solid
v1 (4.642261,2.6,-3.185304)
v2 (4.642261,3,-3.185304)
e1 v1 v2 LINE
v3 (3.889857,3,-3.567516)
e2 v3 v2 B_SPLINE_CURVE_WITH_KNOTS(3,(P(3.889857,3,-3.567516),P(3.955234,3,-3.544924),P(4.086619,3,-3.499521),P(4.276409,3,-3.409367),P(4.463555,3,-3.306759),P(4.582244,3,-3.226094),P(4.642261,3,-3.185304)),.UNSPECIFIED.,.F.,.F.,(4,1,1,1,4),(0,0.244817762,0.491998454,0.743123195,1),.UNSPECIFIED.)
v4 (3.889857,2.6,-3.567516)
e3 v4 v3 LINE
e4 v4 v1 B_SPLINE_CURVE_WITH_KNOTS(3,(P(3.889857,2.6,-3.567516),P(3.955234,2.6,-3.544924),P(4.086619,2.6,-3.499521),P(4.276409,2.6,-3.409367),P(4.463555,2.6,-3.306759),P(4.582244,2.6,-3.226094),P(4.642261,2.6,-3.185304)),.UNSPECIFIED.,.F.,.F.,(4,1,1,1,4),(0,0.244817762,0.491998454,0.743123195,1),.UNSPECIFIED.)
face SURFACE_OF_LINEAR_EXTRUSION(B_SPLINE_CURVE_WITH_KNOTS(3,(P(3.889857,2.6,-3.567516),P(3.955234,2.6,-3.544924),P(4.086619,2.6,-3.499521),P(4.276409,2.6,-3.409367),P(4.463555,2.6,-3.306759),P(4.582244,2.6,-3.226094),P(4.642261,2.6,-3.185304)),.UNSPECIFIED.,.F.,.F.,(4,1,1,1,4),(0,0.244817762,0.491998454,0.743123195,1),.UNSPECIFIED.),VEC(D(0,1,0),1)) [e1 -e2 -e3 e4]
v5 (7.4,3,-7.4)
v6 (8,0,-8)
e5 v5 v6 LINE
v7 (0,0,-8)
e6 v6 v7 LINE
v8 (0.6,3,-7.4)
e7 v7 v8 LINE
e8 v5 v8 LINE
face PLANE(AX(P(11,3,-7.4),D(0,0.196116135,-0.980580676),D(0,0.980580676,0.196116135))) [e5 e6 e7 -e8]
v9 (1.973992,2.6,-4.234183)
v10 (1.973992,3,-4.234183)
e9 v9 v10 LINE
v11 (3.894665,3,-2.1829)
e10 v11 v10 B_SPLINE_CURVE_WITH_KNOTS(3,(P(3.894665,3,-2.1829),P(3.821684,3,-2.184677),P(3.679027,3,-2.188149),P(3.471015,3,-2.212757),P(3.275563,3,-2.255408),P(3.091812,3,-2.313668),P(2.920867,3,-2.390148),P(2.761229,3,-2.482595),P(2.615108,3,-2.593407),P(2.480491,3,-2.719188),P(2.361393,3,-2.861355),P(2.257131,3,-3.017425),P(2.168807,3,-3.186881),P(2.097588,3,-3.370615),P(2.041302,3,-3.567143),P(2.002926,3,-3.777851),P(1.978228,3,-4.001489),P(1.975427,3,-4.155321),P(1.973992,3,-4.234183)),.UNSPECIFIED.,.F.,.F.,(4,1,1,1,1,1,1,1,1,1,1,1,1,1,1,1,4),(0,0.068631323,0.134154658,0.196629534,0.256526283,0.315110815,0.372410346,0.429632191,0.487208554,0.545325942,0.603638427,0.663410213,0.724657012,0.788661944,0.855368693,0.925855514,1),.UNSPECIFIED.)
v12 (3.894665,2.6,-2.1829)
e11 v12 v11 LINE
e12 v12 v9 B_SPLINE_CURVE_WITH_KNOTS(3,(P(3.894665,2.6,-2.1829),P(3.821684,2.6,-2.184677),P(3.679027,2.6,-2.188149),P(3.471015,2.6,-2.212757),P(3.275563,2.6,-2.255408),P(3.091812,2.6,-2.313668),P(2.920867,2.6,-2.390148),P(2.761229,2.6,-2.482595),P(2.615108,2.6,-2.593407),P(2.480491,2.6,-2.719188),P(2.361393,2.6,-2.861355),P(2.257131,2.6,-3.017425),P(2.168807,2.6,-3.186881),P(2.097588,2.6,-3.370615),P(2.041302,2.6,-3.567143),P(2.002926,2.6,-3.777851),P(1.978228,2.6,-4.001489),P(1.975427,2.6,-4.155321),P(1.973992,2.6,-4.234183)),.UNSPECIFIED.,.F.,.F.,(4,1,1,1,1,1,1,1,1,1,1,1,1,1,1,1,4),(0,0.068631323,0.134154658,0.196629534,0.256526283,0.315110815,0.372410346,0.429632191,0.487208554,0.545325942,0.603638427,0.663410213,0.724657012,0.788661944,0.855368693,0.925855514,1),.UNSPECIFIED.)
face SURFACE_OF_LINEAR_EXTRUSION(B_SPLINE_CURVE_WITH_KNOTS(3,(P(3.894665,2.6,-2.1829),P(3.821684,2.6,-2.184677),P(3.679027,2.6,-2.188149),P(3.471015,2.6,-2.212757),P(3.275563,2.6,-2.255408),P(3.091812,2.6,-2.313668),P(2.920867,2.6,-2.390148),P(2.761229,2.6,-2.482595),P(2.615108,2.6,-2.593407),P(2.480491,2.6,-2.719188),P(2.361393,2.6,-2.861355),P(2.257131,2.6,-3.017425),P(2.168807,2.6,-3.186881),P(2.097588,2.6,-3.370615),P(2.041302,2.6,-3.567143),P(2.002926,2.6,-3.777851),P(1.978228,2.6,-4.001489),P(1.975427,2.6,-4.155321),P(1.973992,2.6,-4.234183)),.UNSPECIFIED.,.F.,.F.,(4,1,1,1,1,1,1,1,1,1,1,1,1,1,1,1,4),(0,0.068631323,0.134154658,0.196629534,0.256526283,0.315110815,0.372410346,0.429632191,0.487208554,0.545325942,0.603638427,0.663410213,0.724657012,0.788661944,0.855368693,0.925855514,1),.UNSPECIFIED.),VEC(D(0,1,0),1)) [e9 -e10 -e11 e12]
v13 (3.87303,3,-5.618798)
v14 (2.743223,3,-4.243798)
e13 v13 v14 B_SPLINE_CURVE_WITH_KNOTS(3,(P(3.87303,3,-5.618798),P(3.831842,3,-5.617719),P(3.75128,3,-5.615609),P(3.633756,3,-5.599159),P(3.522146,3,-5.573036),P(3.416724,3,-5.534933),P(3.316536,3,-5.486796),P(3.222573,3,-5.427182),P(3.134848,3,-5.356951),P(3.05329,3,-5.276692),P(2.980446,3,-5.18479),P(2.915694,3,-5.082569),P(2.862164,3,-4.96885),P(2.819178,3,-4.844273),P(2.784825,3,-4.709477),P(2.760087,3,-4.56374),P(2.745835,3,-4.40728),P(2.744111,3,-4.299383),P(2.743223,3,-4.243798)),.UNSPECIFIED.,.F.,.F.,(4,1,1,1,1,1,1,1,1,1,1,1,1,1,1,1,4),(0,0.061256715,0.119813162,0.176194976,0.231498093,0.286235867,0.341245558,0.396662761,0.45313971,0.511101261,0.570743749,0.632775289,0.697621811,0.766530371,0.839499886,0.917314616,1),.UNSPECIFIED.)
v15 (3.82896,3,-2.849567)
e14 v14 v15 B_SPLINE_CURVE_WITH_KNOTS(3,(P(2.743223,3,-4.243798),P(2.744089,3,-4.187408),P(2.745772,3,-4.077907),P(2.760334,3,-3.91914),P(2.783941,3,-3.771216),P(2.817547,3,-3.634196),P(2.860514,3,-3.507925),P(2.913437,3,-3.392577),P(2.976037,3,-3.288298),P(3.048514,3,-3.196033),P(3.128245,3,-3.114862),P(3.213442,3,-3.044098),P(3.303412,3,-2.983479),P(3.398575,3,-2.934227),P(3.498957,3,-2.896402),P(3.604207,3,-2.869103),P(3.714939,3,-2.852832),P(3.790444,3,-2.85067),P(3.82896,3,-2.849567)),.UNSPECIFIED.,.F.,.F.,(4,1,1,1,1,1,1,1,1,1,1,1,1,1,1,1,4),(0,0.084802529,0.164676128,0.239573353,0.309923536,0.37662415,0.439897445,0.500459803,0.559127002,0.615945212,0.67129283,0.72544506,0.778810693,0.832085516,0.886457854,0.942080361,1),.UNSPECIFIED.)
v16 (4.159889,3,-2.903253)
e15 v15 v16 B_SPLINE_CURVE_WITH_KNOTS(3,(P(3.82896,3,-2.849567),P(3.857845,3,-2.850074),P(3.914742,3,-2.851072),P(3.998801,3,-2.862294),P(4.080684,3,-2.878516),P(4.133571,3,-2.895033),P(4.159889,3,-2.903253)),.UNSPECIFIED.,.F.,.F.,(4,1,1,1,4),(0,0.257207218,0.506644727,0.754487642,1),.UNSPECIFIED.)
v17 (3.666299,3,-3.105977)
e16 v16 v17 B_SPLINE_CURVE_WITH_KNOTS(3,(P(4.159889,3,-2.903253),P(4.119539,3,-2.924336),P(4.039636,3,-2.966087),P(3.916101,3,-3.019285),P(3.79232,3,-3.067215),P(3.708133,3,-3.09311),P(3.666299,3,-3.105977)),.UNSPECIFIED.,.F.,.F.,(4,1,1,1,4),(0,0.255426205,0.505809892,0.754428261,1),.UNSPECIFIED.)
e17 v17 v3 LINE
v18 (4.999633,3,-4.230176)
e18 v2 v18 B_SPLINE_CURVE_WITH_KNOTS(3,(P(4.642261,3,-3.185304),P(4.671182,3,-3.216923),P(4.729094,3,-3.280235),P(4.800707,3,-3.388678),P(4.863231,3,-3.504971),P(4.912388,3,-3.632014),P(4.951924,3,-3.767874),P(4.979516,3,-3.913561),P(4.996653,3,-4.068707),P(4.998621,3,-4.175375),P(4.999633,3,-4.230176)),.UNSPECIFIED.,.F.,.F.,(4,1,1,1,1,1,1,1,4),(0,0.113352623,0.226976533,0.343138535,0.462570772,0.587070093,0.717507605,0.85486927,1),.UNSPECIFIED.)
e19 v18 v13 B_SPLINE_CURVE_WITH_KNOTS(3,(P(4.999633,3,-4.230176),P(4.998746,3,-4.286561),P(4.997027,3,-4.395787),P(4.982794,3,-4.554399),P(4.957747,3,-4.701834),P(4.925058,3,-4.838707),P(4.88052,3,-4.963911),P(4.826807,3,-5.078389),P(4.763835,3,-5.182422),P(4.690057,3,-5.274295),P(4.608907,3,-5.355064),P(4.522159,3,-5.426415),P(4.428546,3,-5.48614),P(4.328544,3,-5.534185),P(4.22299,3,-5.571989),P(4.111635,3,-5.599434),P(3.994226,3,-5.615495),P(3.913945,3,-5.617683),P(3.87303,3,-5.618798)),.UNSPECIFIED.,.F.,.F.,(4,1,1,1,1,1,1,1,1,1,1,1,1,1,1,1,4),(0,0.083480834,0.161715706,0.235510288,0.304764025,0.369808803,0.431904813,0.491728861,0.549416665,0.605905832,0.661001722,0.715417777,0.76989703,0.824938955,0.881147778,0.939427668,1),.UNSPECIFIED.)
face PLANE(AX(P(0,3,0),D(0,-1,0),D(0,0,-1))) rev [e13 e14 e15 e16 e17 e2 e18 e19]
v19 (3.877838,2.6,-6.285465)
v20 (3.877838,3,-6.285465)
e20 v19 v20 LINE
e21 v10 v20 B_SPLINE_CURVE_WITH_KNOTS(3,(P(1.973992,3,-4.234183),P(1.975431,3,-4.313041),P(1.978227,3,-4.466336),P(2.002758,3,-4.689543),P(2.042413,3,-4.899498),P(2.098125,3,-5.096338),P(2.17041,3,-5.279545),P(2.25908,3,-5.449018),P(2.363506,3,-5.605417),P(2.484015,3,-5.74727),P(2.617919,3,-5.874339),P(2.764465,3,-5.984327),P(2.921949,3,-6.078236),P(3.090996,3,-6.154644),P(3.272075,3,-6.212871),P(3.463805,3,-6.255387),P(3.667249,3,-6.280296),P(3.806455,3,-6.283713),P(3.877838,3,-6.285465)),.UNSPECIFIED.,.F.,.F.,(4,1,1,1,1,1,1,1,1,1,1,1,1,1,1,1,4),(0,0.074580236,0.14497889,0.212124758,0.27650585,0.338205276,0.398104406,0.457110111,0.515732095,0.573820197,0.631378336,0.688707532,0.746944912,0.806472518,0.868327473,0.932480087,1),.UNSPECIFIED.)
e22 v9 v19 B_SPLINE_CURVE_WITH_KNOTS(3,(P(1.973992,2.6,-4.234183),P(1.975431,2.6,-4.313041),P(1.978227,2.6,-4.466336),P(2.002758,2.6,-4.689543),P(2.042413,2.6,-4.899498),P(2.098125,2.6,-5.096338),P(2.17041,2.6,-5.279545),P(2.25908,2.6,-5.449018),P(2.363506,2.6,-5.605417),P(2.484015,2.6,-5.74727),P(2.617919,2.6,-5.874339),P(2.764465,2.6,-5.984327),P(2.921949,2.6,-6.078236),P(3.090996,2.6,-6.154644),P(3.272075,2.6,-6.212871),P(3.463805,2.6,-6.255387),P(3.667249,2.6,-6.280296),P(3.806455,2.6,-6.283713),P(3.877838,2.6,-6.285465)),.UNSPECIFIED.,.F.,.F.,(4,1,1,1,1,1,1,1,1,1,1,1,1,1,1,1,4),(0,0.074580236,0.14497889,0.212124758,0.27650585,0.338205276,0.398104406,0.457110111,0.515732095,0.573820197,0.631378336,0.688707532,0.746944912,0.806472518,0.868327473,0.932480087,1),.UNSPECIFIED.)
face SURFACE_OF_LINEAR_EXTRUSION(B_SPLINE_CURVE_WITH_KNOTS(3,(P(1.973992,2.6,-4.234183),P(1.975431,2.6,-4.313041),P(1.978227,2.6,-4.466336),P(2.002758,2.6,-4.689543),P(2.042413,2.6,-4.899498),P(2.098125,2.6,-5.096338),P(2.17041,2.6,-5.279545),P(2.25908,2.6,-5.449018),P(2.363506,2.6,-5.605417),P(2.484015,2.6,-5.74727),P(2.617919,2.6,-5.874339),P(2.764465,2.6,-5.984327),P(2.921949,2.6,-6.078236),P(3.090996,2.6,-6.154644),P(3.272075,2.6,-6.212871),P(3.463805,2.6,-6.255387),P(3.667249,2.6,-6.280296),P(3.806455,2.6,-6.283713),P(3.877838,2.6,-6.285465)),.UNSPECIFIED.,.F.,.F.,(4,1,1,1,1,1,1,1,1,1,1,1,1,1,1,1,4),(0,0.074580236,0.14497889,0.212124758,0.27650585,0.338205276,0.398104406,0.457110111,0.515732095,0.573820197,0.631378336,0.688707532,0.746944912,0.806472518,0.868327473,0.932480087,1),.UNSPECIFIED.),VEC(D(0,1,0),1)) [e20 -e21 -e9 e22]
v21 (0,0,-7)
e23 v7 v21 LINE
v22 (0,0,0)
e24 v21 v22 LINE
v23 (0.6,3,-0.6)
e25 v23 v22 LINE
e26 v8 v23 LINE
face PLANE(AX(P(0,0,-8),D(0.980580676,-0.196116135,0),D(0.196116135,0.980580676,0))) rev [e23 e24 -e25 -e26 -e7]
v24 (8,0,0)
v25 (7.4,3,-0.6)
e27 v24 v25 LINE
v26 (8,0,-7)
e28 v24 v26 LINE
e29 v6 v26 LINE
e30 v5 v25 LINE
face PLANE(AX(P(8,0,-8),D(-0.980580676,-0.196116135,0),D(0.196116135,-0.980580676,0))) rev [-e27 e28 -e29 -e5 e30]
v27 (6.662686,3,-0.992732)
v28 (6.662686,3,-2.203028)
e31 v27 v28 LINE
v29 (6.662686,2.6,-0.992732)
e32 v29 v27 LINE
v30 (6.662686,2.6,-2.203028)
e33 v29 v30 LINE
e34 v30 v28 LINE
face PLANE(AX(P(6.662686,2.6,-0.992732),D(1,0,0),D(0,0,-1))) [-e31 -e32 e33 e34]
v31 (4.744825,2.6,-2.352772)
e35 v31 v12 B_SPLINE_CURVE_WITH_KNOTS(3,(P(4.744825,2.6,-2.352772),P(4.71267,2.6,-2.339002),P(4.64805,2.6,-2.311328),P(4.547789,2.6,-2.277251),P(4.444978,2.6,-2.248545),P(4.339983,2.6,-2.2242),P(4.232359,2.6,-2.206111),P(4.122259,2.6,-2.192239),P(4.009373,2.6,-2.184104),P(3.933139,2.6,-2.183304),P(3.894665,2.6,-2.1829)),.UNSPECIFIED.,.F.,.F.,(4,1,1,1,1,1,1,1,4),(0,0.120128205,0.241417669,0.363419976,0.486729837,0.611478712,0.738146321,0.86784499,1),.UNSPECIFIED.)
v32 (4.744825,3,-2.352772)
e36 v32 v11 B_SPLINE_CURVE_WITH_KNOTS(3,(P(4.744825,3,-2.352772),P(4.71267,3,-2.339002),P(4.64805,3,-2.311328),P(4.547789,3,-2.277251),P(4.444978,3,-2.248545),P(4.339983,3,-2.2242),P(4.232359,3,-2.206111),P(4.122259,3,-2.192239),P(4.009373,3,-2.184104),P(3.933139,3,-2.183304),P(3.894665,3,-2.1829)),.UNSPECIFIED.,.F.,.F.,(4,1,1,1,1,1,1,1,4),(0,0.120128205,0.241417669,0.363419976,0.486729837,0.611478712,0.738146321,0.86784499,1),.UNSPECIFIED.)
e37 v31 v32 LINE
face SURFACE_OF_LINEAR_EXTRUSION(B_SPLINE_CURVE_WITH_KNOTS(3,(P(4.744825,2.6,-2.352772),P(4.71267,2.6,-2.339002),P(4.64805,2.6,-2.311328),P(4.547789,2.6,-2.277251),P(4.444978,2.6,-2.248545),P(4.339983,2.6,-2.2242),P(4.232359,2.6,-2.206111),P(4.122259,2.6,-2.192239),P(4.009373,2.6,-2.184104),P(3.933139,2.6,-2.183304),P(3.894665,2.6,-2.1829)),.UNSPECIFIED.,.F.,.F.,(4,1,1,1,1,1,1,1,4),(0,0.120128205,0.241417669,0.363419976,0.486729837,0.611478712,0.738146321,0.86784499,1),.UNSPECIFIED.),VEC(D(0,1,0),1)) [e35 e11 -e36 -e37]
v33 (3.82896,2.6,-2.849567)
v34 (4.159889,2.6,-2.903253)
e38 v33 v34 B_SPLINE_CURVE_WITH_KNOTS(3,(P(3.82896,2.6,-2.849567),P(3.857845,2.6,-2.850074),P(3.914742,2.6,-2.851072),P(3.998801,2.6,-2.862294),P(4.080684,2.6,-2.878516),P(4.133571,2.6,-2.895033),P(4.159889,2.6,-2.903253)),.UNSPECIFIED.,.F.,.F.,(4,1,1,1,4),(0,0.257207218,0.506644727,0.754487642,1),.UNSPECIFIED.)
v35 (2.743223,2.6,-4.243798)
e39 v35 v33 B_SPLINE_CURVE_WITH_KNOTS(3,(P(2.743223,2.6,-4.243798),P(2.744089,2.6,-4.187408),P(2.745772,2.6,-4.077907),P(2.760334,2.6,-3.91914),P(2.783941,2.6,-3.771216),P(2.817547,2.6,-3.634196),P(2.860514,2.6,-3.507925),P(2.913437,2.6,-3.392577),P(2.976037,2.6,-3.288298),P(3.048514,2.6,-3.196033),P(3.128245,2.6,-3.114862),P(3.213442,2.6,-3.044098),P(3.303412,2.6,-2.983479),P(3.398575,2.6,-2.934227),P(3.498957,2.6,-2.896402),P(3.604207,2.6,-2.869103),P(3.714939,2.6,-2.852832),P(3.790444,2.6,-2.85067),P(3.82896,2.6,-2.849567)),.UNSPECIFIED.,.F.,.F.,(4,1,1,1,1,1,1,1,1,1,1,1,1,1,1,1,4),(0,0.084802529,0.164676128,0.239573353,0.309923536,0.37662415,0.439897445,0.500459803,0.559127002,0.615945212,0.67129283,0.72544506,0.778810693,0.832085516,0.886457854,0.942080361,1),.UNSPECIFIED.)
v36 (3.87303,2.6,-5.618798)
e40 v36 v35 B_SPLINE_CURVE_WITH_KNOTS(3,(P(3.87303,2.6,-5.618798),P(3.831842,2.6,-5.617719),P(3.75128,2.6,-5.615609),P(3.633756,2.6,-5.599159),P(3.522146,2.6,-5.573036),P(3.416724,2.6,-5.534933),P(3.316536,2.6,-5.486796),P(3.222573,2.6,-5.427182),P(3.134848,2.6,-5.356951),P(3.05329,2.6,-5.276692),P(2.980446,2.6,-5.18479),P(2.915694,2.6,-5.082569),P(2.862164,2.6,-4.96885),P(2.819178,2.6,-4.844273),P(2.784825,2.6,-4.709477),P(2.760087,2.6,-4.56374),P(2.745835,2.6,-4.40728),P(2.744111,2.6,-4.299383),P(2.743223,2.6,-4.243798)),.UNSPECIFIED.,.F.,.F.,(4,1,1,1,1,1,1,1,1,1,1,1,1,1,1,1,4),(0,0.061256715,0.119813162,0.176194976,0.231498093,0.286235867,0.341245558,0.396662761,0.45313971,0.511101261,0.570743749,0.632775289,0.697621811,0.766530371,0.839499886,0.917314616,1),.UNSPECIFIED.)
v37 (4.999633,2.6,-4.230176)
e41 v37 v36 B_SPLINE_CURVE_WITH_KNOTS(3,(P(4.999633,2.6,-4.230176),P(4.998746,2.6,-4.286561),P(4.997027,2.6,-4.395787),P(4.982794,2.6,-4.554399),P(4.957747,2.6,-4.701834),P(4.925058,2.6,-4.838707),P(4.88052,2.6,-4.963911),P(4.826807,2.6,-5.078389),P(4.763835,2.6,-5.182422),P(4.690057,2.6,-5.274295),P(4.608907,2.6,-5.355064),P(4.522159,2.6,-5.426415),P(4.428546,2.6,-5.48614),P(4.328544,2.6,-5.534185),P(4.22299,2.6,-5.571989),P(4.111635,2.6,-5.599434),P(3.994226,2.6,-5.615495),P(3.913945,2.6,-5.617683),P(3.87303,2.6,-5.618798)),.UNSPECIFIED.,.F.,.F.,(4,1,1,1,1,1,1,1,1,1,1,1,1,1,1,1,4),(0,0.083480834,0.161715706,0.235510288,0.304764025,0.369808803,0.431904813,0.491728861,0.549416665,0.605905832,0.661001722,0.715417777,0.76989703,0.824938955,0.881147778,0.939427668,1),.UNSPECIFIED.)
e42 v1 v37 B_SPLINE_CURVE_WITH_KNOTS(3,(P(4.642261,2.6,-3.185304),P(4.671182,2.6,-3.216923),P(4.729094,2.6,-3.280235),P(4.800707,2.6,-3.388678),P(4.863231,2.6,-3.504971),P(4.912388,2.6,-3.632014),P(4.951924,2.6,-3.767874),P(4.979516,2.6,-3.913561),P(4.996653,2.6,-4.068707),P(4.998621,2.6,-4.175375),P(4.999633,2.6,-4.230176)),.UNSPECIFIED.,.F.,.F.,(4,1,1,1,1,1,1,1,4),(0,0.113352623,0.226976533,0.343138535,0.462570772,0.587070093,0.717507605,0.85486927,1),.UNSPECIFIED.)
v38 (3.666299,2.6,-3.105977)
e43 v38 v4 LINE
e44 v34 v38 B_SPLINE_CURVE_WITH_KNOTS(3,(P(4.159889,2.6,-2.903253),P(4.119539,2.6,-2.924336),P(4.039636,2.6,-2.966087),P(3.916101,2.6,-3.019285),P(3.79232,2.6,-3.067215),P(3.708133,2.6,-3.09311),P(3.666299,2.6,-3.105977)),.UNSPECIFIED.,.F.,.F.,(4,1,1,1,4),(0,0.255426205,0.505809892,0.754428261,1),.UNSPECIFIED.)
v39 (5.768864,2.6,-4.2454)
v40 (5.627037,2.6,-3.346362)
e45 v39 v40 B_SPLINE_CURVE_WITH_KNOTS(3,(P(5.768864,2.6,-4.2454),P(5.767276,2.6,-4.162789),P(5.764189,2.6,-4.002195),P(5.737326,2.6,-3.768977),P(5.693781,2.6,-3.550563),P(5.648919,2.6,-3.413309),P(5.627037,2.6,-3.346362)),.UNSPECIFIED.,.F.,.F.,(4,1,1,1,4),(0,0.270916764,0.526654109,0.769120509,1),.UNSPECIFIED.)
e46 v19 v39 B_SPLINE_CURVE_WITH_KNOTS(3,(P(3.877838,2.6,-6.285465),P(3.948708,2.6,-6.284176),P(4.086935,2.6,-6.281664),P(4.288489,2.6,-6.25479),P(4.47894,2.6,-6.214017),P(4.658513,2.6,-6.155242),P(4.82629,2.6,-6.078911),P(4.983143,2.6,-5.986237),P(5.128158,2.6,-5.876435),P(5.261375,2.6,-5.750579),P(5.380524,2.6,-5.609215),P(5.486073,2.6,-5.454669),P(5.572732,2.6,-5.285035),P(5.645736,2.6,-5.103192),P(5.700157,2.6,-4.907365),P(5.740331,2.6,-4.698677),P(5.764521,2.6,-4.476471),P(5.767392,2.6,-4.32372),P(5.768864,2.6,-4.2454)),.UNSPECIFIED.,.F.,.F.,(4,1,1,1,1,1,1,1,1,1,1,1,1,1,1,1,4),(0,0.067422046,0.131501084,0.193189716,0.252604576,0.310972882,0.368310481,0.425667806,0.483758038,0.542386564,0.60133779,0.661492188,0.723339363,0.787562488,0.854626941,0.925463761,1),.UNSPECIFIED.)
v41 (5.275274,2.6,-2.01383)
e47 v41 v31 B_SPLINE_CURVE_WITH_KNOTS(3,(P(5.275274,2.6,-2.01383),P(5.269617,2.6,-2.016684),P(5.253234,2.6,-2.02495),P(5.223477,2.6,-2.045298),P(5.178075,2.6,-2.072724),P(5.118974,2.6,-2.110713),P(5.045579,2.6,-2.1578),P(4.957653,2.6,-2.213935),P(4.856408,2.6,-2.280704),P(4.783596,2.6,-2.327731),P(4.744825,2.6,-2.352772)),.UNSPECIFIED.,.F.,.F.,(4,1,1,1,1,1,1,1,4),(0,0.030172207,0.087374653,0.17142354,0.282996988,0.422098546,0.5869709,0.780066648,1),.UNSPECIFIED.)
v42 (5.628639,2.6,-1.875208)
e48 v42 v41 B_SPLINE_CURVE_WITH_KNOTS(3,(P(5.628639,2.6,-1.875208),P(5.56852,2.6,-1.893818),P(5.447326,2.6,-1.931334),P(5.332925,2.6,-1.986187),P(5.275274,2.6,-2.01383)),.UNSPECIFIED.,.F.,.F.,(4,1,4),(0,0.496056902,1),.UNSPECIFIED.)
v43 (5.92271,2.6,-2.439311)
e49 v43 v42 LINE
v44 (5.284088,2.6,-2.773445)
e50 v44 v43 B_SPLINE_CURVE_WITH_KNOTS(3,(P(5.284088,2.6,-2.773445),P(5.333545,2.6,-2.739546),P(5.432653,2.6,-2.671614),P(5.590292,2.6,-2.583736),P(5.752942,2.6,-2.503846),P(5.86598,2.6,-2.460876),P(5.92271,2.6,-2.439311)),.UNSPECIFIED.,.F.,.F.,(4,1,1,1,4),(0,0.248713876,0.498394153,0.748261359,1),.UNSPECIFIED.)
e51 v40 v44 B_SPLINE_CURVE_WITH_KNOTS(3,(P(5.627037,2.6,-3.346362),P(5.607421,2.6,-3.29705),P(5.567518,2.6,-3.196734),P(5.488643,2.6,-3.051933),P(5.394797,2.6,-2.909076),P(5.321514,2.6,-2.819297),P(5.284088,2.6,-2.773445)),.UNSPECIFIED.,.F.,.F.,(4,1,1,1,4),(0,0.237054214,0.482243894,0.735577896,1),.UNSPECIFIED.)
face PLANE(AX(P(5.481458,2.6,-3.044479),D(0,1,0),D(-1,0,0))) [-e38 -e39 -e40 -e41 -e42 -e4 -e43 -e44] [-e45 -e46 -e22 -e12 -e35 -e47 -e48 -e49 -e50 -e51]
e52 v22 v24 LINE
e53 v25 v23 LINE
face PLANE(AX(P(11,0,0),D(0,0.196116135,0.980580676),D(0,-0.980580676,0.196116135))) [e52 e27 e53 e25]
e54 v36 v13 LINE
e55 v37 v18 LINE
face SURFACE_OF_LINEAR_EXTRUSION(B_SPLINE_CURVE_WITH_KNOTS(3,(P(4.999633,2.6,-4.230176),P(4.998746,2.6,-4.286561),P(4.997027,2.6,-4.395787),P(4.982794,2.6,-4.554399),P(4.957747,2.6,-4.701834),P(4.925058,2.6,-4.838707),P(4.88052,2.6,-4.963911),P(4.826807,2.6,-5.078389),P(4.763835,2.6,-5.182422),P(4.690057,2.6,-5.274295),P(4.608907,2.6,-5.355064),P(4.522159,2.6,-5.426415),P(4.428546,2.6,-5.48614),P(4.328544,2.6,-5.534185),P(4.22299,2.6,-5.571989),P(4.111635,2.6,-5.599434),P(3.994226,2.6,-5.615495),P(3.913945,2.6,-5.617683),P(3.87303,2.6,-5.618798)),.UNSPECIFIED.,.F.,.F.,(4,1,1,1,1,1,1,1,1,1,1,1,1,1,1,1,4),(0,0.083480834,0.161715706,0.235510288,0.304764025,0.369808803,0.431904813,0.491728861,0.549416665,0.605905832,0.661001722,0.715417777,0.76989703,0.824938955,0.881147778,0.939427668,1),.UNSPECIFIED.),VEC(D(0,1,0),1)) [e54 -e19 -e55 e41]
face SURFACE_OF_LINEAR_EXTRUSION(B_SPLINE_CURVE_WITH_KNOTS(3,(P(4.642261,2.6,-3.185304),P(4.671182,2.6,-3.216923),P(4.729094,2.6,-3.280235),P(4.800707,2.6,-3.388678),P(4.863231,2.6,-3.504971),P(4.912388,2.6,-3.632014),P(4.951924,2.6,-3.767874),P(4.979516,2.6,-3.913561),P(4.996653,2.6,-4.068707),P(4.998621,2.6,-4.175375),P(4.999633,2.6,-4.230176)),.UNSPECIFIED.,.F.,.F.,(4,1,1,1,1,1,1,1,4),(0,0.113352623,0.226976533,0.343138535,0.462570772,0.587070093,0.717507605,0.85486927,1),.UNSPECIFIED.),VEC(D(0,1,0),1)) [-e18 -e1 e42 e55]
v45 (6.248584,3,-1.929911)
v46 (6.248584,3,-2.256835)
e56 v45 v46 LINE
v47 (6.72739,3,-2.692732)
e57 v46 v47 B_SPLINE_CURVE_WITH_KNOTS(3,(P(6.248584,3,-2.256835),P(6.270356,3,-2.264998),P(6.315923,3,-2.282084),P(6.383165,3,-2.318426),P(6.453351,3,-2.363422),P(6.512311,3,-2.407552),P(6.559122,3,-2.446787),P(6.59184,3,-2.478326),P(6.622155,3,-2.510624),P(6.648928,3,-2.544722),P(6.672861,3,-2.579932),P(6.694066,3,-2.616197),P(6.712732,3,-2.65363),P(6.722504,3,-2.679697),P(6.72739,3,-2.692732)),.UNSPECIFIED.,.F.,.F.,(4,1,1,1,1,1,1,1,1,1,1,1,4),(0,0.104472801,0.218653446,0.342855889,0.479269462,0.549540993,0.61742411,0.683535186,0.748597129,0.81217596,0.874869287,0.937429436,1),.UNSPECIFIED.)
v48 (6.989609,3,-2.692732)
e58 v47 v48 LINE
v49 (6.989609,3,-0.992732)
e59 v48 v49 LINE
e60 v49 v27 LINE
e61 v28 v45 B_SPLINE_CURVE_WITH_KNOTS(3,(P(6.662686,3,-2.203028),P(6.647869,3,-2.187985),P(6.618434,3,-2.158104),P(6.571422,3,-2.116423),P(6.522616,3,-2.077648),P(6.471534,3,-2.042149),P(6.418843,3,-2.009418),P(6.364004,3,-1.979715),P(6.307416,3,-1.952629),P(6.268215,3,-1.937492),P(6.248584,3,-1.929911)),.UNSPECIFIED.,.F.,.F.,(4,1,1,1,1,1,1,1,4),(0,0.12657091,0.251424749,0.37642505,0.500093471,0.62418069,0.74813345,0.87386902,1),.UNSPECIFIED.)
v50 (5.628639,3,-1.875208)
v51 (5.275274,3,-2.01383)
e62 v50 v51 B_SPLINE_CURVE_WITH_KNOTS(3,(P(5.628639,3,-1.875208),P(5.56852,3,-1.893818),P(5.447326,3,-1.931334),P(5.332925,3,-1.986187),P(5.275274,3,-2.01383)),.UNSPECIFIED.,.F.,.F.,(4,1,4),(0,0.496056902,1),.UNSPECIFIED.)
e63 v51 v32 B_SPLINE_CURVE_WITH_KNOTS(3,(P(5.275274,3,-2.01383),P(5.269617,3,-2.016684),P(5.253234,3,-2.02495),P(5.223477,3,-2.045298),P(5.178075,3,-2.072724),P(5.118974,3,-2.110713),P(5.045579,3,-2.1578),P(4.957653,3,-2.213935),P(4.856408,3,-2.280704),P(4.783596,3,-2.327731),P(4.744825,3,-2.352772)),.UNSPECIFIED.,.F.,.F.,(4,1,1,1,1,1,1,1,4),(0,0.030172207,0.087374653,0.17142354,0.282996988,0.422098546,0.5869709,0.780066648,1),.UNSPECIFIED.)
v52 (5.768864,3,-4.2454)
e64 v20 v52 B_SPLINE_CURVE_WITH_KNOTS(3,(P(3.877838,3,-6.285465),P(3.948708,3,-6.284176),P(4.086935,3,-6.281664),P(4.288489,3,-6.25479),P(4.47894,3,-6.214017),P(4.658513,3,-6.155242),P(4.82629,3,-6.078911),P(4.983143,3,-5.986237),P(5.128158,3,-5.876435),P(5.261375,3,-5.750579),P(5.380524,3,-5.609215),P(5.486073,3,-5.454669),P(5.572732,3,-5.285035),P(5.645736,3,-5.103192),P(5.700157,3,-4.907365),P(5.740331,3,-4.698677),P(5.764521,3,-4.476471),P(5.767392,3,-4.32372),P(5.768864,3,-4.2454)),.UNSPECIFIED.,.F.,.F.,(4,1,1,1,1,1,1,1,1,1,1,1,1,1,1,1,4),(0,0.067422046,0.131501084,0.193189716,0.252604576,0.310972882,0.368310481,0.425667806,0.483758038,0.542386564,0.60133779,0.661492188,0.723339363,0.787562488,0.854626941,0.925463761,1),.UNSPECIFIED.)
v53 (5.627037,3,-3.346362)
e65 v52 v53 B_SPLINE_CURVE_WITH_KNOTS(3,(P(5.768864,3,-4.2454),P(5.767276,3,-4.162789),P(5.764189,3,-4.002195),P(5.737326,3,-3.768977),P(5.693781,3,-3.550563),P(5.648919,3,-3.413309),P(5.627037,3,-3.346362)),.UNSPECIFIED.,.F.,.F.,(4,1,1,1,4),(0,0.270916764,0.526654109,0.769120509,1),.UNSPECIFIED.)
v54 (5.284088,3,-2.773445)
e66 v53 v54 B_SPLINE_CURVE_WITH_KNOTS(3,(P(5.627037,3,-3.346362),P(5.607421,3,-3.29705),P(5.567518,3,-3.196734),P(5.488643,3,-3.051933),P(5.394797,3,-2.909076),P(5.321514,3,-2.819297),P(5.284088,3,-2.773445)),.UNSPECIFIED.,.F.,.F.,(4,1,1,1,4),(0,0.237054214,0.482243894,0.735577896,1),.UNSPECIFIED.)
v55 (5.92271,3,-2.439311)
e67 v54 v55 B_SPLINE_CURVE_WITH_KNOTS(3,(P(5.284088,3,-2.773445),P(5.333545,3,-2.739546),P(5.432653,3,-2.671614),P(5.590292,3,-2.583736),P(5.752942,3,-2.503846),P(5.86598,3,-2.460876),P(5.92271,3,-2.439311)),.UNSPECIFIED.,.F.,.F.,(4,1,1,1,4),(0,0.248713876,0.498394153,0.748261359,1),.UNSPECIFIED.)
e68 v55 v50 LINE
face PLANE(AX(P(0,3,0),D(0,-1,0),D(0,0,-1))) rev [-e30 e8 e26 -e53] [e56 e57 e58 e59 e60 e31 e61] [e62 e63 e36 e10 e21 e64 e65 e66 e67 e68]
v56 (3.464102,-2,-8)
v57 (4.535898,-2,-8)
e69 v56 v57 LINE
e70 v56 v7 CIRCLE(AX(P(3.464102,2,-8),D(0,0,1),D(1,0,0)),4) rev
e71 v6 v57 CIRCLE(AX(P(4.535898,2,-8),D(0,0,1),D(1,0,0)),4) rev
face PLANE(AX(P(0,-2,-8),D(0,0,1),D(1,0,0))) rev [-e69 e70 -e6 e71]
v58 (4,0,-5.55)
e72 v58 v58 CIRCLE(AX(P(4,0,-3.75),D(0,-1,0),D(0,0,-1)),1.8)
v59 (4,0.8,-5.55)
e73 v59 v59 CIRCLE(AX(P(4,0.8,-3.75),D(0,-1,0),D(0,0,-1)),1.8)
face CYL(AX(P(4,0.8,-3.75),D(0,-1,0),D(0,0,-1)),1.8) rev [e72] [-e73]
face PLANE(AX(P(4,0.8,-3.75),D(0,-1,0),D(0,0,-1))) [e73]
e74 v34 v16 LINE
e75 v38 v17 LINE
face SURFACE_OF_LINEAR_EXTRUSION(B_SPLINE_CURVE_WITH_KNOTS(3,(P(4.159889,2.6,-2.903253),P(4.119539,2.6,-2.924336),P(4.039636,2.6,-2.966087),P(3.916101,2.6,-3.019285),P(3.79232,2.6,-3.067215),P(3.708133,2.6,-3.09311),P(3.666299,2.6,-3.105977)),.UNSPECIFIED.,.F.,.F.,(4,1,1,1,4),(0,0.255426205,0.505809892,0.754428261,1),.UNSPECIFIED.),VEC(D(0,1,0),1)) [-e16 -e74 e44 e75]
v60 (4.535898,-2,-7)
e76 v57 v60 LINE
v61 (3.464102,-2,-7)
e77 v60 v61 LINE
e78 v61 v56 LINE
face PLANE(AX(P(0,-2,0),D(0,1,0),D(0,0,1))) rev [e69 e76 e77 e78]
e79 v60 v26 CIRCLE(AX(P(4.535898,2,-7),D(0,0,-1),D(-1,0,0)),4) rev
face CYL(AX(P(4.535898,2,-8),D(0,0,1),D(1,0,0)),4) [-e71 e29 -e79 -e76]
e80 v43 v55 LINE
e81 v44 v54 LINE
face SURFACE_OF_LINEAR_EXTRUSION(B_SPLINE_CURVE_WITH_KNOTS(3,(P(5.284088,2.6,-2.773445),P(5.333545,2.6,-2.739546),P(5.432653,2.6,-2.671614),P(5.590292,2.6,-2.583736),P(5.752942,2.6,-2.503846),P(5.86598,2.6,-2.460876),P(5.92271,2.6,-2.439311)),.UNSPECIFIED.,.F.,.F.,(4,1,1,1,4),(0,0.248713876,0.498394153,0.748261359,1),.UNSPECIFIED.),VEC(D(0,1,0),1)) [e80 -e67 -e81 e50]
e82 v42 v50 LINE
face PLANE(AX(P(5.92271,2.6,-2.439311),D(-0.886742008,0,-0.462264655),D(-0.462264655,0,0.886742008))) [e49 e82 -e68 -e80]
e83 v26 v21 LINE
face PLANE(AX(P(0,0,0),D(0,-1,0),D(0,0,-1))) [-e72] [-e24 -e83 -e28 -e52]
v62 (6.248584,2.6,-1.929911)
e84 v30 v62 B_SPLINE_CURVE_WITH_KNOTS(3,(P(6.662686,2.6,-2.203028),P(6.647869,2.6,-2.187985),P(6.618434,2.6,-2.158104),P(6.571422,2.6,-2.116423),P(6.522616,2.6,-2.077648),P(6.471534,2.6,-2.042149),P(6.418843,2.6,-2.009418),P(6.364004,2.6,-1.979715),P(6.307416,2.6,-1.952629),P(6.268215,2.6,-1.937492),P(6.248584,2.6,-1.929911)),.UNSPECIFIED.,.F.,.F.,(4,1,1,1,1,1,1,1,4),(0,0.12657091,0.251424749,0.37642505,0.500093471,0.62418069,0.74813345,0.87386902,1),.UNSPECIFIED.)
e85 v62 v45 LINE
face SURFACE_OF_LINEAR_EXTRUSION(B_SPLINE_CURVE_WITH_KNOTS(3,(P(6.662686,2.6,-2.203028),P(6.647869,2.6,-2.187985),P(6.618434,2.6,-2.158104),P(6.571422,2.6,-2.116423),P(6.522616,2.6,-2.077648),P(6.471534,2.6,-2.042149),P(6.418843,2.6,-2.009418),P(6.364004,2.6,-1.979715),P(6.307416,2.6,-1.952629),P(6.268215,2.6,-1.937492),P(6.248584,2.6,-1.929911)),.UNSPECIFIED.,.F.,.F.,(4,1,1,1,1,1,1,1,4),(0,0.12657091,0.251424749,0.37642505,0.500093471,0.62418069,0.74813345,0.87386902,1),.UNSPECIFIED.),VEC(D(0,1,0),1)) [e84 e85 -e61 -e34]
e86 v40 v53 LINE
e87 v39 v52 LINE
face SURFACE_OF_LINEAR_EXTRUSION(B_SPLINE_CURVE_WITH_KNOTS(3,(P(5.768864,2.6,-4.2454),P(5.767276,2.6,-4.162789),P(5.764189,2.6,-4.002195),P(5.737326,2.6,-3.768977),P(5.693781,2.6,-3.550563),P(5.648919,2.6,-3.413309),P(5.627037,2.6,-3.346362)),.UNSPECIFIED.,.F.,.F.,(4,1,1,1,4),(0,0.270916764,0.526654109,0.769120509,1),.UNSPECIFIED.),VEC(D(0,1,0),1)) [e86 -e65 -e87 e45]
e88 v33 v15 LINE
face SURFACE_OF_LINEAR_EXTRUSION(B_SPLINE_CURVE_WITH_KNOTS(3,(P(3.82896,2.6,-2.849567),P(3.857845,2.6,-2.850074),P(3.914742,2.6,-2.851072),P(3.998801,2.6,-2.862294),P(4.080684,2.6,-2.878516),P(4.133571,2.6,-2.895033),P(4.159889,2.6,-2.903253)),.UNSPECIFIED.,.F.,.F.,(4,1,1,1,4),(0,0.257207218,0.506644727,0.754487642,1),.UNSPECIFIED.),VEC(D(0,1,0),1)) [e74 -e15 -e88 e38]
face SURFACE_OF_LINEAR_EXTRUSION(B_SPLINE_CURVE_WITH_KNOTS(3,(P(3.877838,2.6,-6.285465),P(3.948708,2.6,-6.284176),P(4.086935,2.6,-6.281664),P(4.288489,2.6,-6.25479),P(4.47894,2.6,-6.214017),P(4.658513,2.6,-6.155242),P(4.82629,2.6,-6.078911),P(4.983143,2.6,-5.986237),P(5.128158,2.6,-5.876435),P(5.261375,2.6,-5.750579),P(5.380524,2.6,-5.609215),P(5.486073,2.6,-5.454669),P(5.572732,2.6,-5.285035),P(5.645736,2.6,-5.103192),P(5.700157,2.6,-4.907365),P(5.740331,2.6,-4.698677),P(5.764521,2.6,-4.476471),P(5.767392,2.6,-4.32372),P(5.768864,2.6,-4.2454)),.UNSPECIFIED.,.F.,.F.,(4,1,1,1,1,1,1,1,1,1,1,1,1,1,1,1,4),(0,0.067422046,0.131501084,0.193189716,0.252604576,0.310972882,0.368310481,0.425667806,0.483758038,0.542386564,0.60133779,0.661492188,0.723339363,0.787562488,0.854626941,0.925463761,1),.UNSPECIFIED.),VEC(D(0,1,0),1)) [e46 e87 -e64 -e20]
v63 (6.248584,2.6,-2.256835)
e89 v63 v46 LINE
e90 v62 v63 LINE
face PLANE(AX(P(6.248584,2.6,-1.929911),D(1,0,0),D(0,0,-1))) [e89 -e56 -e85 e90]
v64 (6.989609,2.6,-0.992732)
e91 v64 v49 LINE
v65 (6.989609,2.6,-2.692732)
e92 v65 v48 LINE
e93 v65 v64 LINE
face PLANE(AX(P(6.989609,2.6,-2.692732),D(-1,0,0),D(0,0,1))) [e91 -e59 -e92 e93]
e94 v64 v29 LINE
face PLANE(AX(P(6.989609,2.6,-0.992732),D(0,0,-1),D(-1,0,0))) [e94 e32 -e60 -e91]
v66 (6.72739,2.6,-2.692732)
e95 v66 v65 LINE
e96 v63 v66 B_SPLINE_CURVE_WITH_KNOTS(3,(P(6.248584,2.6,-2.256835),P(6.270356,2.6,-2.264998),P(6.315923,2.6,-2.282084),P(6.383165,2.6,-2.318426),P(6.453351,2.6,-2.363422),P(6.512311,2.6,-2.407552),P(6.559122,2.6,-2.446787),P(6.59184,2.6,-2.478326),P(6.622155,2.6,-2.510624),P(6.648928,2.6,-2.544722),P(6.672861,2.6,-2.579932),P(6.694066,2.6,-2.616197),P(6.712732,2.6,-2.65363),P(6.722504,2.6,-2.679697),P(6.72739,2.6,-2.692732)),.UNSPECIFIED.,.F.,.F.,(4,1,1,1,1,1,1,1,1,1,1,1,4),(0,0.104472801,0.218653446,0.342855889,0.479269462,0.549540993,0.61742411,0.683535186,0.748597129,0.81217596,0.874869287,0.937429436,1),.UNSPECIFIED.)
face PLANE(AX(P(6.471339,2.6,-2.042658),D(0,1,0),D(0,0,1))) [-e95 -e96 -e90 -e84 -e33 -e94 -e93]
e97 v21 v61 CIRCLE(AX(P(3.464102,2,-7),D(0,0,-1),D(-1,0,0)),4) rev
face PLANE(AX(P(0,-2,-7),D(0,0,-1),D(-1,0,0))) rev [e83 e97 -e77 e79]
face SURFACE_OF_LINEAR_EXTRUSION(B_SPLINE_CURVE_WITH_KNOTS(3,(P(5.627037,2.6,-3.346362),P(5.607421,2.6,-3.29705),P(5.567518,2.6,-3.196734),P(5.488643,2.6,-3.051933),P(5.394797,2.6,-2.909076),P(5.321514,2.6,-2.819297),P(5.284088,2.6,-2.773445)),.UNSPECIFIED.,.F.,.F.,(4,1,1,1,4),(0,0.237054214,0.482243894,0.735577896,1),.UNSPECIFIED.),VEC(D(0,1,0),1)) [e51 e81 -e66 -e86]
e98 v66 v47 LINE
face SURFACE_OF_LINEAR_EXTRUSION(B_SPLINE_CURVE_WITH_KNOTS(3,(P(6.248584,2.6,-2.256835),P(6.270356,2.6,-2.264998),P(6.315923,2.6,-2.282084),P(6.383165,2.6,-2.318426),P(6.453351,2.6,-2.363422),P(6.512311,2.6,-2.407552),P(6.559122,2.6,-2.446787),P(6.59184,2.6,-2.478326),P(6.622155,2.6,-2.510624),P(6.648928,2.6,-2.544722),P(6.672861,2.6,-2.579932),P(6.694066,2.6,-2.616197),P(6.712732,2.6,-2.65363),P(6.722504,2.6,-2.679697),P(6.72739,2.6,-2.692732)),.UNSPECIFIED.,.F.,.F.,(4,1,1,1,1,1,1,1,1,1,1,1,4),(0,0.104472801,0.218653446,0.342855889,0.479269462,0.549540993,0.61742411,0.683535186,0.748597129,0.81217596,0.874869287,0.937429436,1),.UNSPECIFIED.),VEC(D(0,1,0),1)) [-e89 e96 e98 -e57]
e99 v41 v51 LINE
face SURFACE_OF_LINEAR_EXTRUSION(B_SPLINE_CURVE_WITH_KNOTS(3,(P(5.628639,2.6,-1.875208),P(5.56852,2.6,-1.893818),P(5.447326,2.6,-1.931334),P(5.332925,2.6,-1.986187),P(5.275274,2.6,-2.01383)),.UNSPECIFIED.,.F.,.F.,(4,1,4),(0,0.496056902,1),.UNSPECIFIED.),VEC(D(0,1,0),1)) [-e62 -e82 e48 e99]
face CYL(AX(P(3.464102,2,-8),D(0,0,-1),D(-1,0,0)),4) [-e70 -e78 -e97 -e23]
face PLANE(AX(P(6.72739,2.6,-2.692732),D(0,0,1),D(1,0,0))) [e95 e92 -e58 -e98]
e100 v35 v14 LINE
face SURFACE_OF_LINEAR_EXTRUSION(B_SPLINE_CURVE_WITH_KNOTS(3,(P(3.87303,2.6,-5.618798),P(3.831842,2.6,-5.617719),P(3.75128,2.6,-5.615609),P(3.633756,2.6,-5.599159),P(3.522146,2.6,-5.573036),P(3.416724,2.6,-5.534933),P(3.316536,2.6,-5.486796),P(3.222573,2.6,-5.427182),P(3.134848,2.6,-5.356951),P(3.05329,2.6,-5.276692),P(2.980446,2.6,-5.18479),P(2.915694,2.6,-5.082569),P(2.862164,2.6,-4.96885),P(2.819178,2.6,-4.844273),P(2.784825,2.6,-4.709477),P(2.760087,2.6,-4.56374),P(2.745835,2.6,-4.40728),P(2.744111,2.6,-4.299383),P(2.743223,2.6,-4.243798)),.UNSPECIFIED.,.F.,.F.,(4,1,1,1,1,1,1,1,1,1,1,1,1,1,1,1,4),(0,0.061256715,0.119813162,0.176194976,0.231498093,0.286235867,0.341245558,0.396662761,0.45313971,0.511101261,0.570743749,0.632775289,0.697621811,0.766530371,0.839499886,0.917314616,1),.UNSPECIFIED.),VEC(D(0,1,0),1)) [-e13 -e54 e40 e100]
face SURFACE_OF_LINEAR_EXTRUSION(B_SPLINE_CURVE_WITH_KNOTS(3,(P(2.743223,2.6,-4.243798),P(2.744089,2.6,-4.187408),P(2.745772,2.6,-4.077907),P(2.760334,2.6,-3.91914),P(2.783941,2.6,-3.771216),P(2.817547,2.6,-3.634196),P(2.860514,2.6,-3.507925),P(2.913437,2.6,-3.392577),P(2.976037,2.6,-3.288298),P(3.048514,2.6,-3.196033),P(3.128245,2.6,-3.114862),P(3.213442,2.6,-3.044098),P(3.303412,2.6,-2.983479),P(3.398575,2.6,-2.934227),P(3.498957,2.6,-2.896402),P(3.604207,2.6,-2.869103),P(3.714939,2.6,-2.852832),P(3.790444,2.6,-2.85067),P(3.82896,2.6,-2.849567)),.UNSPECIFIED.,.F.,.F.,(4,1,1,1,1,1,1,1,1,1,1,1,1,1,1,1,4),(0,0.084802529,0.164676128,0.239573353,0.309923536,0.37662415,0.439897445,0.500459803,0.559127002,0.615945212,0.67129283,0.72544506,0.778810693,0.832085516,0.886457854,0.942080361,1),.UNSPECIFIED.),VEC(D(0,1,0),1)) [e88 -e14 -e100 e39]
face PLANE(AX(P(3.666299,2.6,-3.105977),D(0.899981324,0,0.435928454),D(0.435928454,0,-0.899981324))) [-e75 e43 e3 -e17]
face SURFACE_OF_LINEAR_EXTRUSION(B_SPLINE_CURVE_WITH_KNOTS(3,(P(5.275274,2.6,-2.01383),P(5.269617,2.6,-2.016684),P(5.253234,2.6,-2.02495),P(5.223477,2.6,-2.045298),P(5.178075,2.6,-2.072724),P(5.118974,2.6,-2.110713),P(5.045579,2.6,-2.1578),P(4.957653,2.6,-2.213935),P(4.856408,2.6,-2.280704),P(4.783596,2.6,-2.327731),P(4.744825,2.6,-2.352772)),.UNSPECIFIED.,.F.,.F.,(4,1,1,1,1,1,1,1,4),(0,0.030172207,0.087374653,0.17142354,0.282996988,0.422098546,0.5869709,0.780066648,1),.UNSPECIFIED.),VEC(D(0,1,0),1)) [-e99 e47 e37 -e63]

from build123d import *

# Parameters (mm, degrees)
SKETCH1_W               = 8
SKETCH1_H               = 8
BOSS_EXTRUDE1_DEPTH     = 3
CUT_EXTRUDE1_DEPTH      = 12.704699911
CUT_EXTRUDE1_DEPTH_BACK = 12.704699911
CUT_EXTRUDE2_DEPTH      = 11
SKETCH4_R               = 1.8
CUT_EXTRUDE3_DEPTH      = 0.8
SKETCH5_W               = 8
SKETCH5_H               = 1
BOSS_EXTRUDE2_DEPTH     = 2
FILLET1_R               = 4
CUT_EXTRUDE4_DEPTH      = 0.4
CUT_EXTRUDE5_DEPTH      = 0.4


with BuildPart() as part:
    # Sketch1 → Boss-Extrude1 (new body)
    with BuildSketch(Plane(origin=(0, 0, 0), x_dir=(1, 0, 0), z_dir=(0, 1, 0))):
        with Locations((4, 4)):
            Rectangle(SKETCH1_W, SKETCH1_H)
    extrude(amount=BOSS_EXTRUDE1_DEPTH)

    # Sketch2 → Cut-Extrude1 (cut, two sides: drawn at the far end of the back side and taken through both)
    with BuildSketch(Plane.XY.offset(-CUT_EXTRUDE1_DEPTH_BACK)):
        Polygon((0, 0), (0.6, 3), (0, 3), align=None)
        Polygon((8, 0), (7.4, 3), (8, 3), align=None)
    extrude(amount=CUT_EXTRUDE1_DEPTH + CUT_EXTRUDE1_DEPTH_BACK, mode=Mode.SUBTRACT)

    # Sketch3 → Cut-Extrude2 (cut)
    with BuildSketch(Plane(origin=(0, 0, 0), x_dir=(0, 0, -1), z_dir=(1, 0, 0))):
        Polygon((0, 0), (0.6, 3), (0, 3), align=None)
        Polygon((8, 3), (7.4, 3), (8, 0), align=None)
    extrude(amount=CUT_EXTRUDE2_DEPTH, mode=Mode.SUBTRACT)

    # Sketch4 → Cut-Extrude3 (cut)
    with BuildSketch(Plane.XZ):
        with Locations(Location((4, -3.75, 0), (0, 0, 270))):
            Circle(SKETCH4_R)
    extrude(amount=-CUT_EXTRUDE3_DEPTH, mode=Mode.SUBTRACT)

    # Sketch5 → Boss-Extrude2 (add)
    with BuildSketch(Plane.XZ):
        with Locations((4, -7.5)):
            Rectangle(SKETCH5_W, SKETCH5_H)
    extrude(amount=BOSS_EXTRUDE2_DEPTH)

    # Fillet1
    # the kernel refuses this fillet: 4 mm, written as the material it takes off along each edge
    with BuildSketch(Plane(origin=(8, -2, -16.660254038), x_dir=(0, 1, 0), z_dir=(0, 0, 1)), Plane(origin=(0, -2, 1.660254038), x_dir=(0, 1, 0), z_dir=(0, 0, -1))) as fillet1_piece_1:
        with BuildLine():
            CenterArc((4, 3.464101615), FILLET1_R, 180, 60)
            Line((0, 3.464101615), (-0.08, 3.464101615))
            Line((-0.08, 3.464101615), (-0.08, 0))
            Line((-0.08, 0), (0, -0.08))
            ThreePointArc((0, -0.08), (1, -0.08), (1.96, -0.069282032))
            Line((1.96, -0.069282032), (2, 0))
        make_face()
    extrude(amount=18.320508076, mode=Mode.SUBTRACT)

    # Sketch6 → Cut-Extrude4 (cut)
    with BuildSketch(Plane(origin=(0, 3, 0), x_dir=(1, 0, 0), z_dir=(0, 1, 0))):
        with BuildLine():
            add(Edge.make_bspline(
                [(5.284087955, 2.773445367), (5.333545491, 2.739545524), (5.432652736, 2.671614118), (5.590291823, 2.583736248), (5.752942084, 2.503846486), (5.865979951, 2.460876102), (5.92270975, 2.439310751)],
                knots=[0, 0, 0, 0, 0.994855506, 1.99357661, 2.993045438, 4, 4, 4, 4], degree=3))
            Line((5.92270975, 2.439310751), (5.628639237, 1.875208187))
            add(Edge.make_bspline(
                [(5.628639237, 1.875208187), (5.568520037, 1.893818156), (5.447325875, 1.93133395), (5.332925255, 1.986187111), (5.275273852, 2.013829982)],
                knots=[0, 0, 0, 0, 0.992113803, 2, 2, 2, 2], degree=3))
            add(Edge.make_bspline(
                [(5.275273852, 2.013829982), (5.26961656, 2.016684314), (5.253233801, 2.024950075), (5.223476786, 2.045298413), (5.178074812, 2.072724498), (5.118973761, 2.11071311), (5.045578888, 2.157800121), (4.95765273, 2.213934729), (4.856407872, 2.280704114), (4.783596416, 2.327731001), (4.744825134, 2.35277229)],
                knots=[0, 0, 0, 0, 0.241377655, 0.698997227, 1.371388316, 2.263975901, 3.376788369, 4.695767198, 6.240533187, 8, 8, 8, 8], degree=3))
            add(Edge.make_bspline(
                [(4.744825134, 2.35277229), (4.712670389, 2.339001865), (4.648050063, 2.311327899), (4.547788838, 2.27725121), (4.444978029, 2.248544986), (4.339982896, 2.224200245), (4.232359046, 2.206111381), (4.122258624, 2.192239309), (4.00937299, 2.18410397), (3.933139287, 2.183304154), (3.894664878, 2.182900495)],
                knots=[0, 0, 0, 0, 0.961025642, 1.931341354, 2.907359807, 3.893838693, 4.891829695, 5.905170566, 6.942759923, 8, 8, 8, 8], degree=3))
            add(Edge.make_bspline(
                [(3.894664878, 2.182900495), (3.821683976, 2.184676763), (3.679027131, 2.188148859), (3.471015208, 2.212756542), (3.275562804, 2.255408477), (3.091812023, 2.313667662), (2.920867424, 2.390147666), (2.761229426, 2.482594503), (2.615108223, 2.593406711), (2.480490537, 2.71918809), (2.361392609, 2.861354588), (2.257130725, 3.017424584), (2.168806746, 3.186880722), (2.097587685, 3.370615377), (2.041301668, 3.567142879), (2.002926315, 3.777850586), (1.978227581, 4.001488849), (1.975427333, 4.155321196), (1.973991801, 4.234182546)],
                knots=[0, 0, 0, 0, 1.098101164, 2.146474535, 3.146072545, 4.104420533, 5.041773038, 5.958565538, 6.874115049, 7.795336865, 8.725215067, 9.658214839, 10.614563411, 11.594512188, 12.618591104, 13.685899083, 14.813688224, 16, 16, 16, 16], degree=3))
            add(Edge.make_bspline(
                [(1.973991801, 4.234182546), (1.97543059, 4.313040679), (1.978227497, 4.466335509), (2.002757559, 4.689542909), (2.042412611, 4.899497801), (2.098124704, 5.096337583), (2.170410456, 5.279545107), (2.259079723, 5.449017762), (2.363505524, 5.605417057), (2.484015277, 5.747270094), (2.617919267, 5.874338646), (2.764464989, 5.984327234), (2.9219486, 6.078236158), (3.090996271, 6.154643933), (3.272074664, 6.212871015), (3.463805003, 6.255387163), (3.667248709, 6.280295733), (3.806454886, 6.283712517), (3.877837955, 6.285464598)],
                knots=[0, 0, 0, 0, 1.193283781, 2.319662245, 3.393996131, 4.424093603, 5.411284417, 6.369670503, 7.313761776, 8.251713527, 9.181123148, 10.102053383, 11.01932051, 11.951118596, 12.903560284, 13.893239571, 14.919681386, 16, 16, 16, 16], degree=3))
            add(Edge.make_bspline(
                [(3.877837955, 6.285464598), (3.948708316, 6.284176334), (4.086935049, 6.281663683), (4.288489067, 6.254790298), (4.478939684, 6.214016744), (4.658513444, 6.155241629), (4.826290277, 6.078911265), (4.983143341, 5.98623667), (5.128157857, 5.876434989), (5.26137487, 5.750578969), (5.380523981, 5.609215368), (5.486073462, 5.454669187), (5.572731816, 5.285035211), (5.645736122, 5.103191508), (5.700157026, 4.90736457), (5.740330715, 4.69867705), (5.764520815, 4.476471411), (5.76739165, 4.323719862), (5.768863596, 4.245400495)],
                knots=[0, 0, 0, 0, 1.078752742, 2.104017338, 3.091035458, 4.041673215, 4.975566109, 5.892967701, 6.810684895, 7.740128604, 8.678185021, 9.621404646, 10.583875016, 11.573429805, 12.6009998, 13.674031063, 14.80742018, 16, 16, 16, 16], degree=3))
            add(Edge.make_bspline(
                [(5.768863596, 4.245400495), (5.767275795, 4.16278925), (5.764189157, 4.002195454), (5.737326284, 3.768977018), (5.693780668, 3.550562854), (5.648918616, 3.41330904), (5.627036673, 3.346362034)],
                knots=[0, 0, 0, 0, 1.083667057, 2.106616435, 3.076482036, 4, 4, 4, 4], degree=3))
            add(Edge.make_bspline(
                [(5.627036673, 3.346362034), (5.607421404, 3.297050064), (5.567517691, 3.196733787), (5.488642668, 3.051933408), (5.394797316, 2.909076479), (5.321514211, 2.819296637), (5.284087955, 2.773445367)],
                knots=[0, 0, 0, 0, 0.948216854, 1.928975575, 2.942311585, 4, 4, 4, 4], degree=3))
        make_face()
        with BuildLine():
            add(Edge.make_bspline(
                [(4.642261032, 3.185304341), (4.671182259, 3.216922768), (4.72909393, 3.280235293), (4.800707281, 3.388678336), (4.863230922, 3.50497094), (4.912388312, 3.632014464), (4.951923574, 3.76787431), (4.97951585, 3.913560578), (4.996652709, 4.068707035), (4.998621406, 4.175375245), (4.999632827, 4.230176136)],
                knots=[0, 0, 0, 0, 0.906820982, 1.815812261, 2.745108282, 3.70056618, 4.696560745, 5.740060838, 6.83895416, 8, 8, 8, 8], degree=3))
            add(Edge.make_bspline(
                [(4.999632827, 4.230176136), (4.998745764, 4.286560817), (4.997027382, 4.395786947), (4.982794262, 4.554398979), (4.957747484, 4.70183414), (4.925058455, 4.838707416), (4.88052022, 4.963910999), (4.826807351, 5.078388614), (4.763835344, 5.182421929), (4.690056733, 5.274294514), (4.608907177, 5.355063587), (4.522159409, 5.426414517), (4.428546166, 5.486139657), (4.328544236, 5.534184829), (4.222990468, 5.571989212), (4.111634776, 5.59943433), (3.994225982, 5.615495039), (3.913944994, 5.6176829), (3.873030263, 5.618797931)],
                knots=[0, 0, 0, 0, 1.335693338, 2.587451293, 3.768164612, 4.876224393, 5.916940853, 6.910477009, 7.867661778, 8.790666633, 9.694493319, 10.576027549, 11.446684429, 12.318352473, 13.199023277, 14.098364444, 15.030842682, 16, 16, 16, 16], degree=3))
            add(Edge.make_bspline(
                [(3.873030263, 5.618797931), (3.831841607, 5.617719084), (3.751279942, 5.615608947), (3.633755604, 5.599158788), (3.522145798, 5.573035665), (3.416723766, 5.534932642), (3.316536446, 5.486796326), (3.222573421, 5.427181815), (3.134847786, 5.356951252), (3.053289548, 5.276692152), (2.980446173, 5.184790487), (2.915694165, 5.082568667), (2.862164439, 4.968850144), (2.819178201, 4.84427298), (2.784825228, 4.709477379), (2.760087026, 4.563739976), (2.745835322, 4.407279692), (2.744110931, 4.299383286), (2.74322257, 4.243797931)],
                knots=[0, 0, 0, 0, 0.980107447, 1.917010591, 2.819119613, 3.703969481, 4.579773866, 5.459928929, 6.346604172, 7.250235365, 8.177620171, 9.131899985, 10.124404622, 11.161948974, 12.264485933, 13.431998172, 14.677033863, 16, 16, 16, 16], degree=3))
            add(Edge.make_bspline(
                [(2.74322257, 4.243797931), (2.744089067, 4.187408458), (2.745771696, 4.077907007), (2.760333697, 3.91913972), (2.783941374, 3.771215716), (2.817547327, 3.634196218), (2.86051391, 3.507924697), (2.913437174, 3.392577112), (2.976036542, 3.288297709), (3.048513511, 3.196032652), (3.128245057, 3.114861766), (3.213441608, 3.04409835), (3.303411645, 2.983479498), (3.39857486, 2.934226809), (3.498956775, 2.896402137), (3.604207339, 2.869103357), (3.714939061, 2.852831885), (3.790443662, 2.850669982), (3.82895975, 2.849567162)],
                knots=[0, 0, 0, 0, 1.356840463, 2.634818045, 3.833173645, 4.958776583, 6.025986406, 7.038359119, 8.007356852, 8.946032033, 9.855123386, 10.740685277, 11.607120956, 12.460971081, 13.313368256, 14.183325659, 15.073285775, 16, 16, 16, 16], degree=3))
            add(Edge.make_bspline(
                [(3.82895975, 2.849567162), (3.857844622, 2.850073951), (3.914741814, 2.851072222), (3.998801079, 2.862293633), (4.080683558, 2.878515583), (4.133570622, 2.895033243), (4.159889237, 2.903253059)],
                knots=[0, 0, 0, 0, 1.028828871, 2.026578908, 3.017950568, 4, 4, 4, 4], degree=3))
            add(Edge.make_bspline(
                [(4.159889237, 2.903253059), (4.119539232, 2.924336443), (4.039635796, 2.966086993), (3.916101198, 3.019284802), (3.792319766, 3.067214804), (3.708133251, 3.09310976), (3.666299493, 3.105977418)],
                knots=[0, 0, 0, 0, 1.021704821, 2.023239566, 3.017713044, 4, 4, 4, 4], degree=3))
            Line((3.666299493, 3.105977418), (3.889857186, 3.56751588))
            add(Edge.make_bspline(
                [(3.889857186, 3.56751588), (3.955233958, 3.544923565), (4.086618506, 3.49952088), (4.276409331, 3.409366748), (4.463555304, 3.306758821), (4.582244486, 3.226093623), (4.642261032, 3.185304341)],
                knots=[0, 0, 0, 0, 0.979271047, 1.967993817, 2.972492781, 4, 4, 4, 4], degree=3))
        make_face(mode=Mode.SUBTRACT)
    extrude(amount=-CUT_EXTRUDE4_DEPTH, mode=Mode.SUBTRACT)

    # Sketch7 → Cut-Extrude5 (cut)
    with BuildSketch(Plane(origin=(0, 3, 0), x_dir=(1, 0, 0), z_dir=(0, 1, 0))):
        with BuildLine():
            Line((6.989609495, 0.992731968), (6.662686419, 0.992731968))
            Line((6.662686419, 0.992731968), (6.662686419, 2.203028442))
            add(Edge.make_bspline(
                [(6.662686419, 2.203028442), (6.647868508, 2.187985499), (6.618433709, 2.158103687), (6.571421698, 2.116422543), (6.522616062, 2.07764809), (6.471533827, 2.042148614), (6.418842766, 2.009418309), (6.364004407, 1.979715431), (6.307416238, 1.952628999), (6.268215163, 1.937491891), (6.248583854, 1.929911455)],
                knots=[0, 0, 0, 0, 1.012567276, 2.011397996, 3.011400399, 4.000747768, 4.993445519, 5.985067596, 6.990952157, 8, 8, 8, 8], degree=3))
            Line((6.248583854, 1.929911455), (6.248583854, 2.256834532))
            add(Edge.make_bspline(
                [(6.248583854, 2.256834532), (6.270355964, 2.264998139), (6.315923296, 2.282083933), (6.383165354, 2.318426283), (6.453350876, 2.363421778), (6.512310721, 2.40755194), (6.559122414, 2.44678718), (6.591840229, 2.478326157), (6.622155165, 2.510623705), (6.648927745, 2.544722271), (6.672860762, 2.579932457), (6.694066458, 2.616196741), (6.712732345, 2.65362968), (6.722503807, 2.679697149), (6.727389944, 2.692731968)],
                knots=[0, 0, 0, 0, 1.253673617, 2.623841347, 4.114270668, 5.751233548, 6.594491912, 7.409089316, 8.202422231, 8.983165545, 9.746111525, 10.498431446, 11.249153235, 12, 12, 12, 12], degree=3))
            Line((6.727389944, 2.692731968), (6.989609495, 2.692731968))
            Line((6.989609495, 2.692731968), (6.989609495, 0.992731968))
        make_face()
    extrude(amount=-CUT_EXTRUDE5_DEPTH, mode=Mode.SUBTRACT)


solid = part.part
